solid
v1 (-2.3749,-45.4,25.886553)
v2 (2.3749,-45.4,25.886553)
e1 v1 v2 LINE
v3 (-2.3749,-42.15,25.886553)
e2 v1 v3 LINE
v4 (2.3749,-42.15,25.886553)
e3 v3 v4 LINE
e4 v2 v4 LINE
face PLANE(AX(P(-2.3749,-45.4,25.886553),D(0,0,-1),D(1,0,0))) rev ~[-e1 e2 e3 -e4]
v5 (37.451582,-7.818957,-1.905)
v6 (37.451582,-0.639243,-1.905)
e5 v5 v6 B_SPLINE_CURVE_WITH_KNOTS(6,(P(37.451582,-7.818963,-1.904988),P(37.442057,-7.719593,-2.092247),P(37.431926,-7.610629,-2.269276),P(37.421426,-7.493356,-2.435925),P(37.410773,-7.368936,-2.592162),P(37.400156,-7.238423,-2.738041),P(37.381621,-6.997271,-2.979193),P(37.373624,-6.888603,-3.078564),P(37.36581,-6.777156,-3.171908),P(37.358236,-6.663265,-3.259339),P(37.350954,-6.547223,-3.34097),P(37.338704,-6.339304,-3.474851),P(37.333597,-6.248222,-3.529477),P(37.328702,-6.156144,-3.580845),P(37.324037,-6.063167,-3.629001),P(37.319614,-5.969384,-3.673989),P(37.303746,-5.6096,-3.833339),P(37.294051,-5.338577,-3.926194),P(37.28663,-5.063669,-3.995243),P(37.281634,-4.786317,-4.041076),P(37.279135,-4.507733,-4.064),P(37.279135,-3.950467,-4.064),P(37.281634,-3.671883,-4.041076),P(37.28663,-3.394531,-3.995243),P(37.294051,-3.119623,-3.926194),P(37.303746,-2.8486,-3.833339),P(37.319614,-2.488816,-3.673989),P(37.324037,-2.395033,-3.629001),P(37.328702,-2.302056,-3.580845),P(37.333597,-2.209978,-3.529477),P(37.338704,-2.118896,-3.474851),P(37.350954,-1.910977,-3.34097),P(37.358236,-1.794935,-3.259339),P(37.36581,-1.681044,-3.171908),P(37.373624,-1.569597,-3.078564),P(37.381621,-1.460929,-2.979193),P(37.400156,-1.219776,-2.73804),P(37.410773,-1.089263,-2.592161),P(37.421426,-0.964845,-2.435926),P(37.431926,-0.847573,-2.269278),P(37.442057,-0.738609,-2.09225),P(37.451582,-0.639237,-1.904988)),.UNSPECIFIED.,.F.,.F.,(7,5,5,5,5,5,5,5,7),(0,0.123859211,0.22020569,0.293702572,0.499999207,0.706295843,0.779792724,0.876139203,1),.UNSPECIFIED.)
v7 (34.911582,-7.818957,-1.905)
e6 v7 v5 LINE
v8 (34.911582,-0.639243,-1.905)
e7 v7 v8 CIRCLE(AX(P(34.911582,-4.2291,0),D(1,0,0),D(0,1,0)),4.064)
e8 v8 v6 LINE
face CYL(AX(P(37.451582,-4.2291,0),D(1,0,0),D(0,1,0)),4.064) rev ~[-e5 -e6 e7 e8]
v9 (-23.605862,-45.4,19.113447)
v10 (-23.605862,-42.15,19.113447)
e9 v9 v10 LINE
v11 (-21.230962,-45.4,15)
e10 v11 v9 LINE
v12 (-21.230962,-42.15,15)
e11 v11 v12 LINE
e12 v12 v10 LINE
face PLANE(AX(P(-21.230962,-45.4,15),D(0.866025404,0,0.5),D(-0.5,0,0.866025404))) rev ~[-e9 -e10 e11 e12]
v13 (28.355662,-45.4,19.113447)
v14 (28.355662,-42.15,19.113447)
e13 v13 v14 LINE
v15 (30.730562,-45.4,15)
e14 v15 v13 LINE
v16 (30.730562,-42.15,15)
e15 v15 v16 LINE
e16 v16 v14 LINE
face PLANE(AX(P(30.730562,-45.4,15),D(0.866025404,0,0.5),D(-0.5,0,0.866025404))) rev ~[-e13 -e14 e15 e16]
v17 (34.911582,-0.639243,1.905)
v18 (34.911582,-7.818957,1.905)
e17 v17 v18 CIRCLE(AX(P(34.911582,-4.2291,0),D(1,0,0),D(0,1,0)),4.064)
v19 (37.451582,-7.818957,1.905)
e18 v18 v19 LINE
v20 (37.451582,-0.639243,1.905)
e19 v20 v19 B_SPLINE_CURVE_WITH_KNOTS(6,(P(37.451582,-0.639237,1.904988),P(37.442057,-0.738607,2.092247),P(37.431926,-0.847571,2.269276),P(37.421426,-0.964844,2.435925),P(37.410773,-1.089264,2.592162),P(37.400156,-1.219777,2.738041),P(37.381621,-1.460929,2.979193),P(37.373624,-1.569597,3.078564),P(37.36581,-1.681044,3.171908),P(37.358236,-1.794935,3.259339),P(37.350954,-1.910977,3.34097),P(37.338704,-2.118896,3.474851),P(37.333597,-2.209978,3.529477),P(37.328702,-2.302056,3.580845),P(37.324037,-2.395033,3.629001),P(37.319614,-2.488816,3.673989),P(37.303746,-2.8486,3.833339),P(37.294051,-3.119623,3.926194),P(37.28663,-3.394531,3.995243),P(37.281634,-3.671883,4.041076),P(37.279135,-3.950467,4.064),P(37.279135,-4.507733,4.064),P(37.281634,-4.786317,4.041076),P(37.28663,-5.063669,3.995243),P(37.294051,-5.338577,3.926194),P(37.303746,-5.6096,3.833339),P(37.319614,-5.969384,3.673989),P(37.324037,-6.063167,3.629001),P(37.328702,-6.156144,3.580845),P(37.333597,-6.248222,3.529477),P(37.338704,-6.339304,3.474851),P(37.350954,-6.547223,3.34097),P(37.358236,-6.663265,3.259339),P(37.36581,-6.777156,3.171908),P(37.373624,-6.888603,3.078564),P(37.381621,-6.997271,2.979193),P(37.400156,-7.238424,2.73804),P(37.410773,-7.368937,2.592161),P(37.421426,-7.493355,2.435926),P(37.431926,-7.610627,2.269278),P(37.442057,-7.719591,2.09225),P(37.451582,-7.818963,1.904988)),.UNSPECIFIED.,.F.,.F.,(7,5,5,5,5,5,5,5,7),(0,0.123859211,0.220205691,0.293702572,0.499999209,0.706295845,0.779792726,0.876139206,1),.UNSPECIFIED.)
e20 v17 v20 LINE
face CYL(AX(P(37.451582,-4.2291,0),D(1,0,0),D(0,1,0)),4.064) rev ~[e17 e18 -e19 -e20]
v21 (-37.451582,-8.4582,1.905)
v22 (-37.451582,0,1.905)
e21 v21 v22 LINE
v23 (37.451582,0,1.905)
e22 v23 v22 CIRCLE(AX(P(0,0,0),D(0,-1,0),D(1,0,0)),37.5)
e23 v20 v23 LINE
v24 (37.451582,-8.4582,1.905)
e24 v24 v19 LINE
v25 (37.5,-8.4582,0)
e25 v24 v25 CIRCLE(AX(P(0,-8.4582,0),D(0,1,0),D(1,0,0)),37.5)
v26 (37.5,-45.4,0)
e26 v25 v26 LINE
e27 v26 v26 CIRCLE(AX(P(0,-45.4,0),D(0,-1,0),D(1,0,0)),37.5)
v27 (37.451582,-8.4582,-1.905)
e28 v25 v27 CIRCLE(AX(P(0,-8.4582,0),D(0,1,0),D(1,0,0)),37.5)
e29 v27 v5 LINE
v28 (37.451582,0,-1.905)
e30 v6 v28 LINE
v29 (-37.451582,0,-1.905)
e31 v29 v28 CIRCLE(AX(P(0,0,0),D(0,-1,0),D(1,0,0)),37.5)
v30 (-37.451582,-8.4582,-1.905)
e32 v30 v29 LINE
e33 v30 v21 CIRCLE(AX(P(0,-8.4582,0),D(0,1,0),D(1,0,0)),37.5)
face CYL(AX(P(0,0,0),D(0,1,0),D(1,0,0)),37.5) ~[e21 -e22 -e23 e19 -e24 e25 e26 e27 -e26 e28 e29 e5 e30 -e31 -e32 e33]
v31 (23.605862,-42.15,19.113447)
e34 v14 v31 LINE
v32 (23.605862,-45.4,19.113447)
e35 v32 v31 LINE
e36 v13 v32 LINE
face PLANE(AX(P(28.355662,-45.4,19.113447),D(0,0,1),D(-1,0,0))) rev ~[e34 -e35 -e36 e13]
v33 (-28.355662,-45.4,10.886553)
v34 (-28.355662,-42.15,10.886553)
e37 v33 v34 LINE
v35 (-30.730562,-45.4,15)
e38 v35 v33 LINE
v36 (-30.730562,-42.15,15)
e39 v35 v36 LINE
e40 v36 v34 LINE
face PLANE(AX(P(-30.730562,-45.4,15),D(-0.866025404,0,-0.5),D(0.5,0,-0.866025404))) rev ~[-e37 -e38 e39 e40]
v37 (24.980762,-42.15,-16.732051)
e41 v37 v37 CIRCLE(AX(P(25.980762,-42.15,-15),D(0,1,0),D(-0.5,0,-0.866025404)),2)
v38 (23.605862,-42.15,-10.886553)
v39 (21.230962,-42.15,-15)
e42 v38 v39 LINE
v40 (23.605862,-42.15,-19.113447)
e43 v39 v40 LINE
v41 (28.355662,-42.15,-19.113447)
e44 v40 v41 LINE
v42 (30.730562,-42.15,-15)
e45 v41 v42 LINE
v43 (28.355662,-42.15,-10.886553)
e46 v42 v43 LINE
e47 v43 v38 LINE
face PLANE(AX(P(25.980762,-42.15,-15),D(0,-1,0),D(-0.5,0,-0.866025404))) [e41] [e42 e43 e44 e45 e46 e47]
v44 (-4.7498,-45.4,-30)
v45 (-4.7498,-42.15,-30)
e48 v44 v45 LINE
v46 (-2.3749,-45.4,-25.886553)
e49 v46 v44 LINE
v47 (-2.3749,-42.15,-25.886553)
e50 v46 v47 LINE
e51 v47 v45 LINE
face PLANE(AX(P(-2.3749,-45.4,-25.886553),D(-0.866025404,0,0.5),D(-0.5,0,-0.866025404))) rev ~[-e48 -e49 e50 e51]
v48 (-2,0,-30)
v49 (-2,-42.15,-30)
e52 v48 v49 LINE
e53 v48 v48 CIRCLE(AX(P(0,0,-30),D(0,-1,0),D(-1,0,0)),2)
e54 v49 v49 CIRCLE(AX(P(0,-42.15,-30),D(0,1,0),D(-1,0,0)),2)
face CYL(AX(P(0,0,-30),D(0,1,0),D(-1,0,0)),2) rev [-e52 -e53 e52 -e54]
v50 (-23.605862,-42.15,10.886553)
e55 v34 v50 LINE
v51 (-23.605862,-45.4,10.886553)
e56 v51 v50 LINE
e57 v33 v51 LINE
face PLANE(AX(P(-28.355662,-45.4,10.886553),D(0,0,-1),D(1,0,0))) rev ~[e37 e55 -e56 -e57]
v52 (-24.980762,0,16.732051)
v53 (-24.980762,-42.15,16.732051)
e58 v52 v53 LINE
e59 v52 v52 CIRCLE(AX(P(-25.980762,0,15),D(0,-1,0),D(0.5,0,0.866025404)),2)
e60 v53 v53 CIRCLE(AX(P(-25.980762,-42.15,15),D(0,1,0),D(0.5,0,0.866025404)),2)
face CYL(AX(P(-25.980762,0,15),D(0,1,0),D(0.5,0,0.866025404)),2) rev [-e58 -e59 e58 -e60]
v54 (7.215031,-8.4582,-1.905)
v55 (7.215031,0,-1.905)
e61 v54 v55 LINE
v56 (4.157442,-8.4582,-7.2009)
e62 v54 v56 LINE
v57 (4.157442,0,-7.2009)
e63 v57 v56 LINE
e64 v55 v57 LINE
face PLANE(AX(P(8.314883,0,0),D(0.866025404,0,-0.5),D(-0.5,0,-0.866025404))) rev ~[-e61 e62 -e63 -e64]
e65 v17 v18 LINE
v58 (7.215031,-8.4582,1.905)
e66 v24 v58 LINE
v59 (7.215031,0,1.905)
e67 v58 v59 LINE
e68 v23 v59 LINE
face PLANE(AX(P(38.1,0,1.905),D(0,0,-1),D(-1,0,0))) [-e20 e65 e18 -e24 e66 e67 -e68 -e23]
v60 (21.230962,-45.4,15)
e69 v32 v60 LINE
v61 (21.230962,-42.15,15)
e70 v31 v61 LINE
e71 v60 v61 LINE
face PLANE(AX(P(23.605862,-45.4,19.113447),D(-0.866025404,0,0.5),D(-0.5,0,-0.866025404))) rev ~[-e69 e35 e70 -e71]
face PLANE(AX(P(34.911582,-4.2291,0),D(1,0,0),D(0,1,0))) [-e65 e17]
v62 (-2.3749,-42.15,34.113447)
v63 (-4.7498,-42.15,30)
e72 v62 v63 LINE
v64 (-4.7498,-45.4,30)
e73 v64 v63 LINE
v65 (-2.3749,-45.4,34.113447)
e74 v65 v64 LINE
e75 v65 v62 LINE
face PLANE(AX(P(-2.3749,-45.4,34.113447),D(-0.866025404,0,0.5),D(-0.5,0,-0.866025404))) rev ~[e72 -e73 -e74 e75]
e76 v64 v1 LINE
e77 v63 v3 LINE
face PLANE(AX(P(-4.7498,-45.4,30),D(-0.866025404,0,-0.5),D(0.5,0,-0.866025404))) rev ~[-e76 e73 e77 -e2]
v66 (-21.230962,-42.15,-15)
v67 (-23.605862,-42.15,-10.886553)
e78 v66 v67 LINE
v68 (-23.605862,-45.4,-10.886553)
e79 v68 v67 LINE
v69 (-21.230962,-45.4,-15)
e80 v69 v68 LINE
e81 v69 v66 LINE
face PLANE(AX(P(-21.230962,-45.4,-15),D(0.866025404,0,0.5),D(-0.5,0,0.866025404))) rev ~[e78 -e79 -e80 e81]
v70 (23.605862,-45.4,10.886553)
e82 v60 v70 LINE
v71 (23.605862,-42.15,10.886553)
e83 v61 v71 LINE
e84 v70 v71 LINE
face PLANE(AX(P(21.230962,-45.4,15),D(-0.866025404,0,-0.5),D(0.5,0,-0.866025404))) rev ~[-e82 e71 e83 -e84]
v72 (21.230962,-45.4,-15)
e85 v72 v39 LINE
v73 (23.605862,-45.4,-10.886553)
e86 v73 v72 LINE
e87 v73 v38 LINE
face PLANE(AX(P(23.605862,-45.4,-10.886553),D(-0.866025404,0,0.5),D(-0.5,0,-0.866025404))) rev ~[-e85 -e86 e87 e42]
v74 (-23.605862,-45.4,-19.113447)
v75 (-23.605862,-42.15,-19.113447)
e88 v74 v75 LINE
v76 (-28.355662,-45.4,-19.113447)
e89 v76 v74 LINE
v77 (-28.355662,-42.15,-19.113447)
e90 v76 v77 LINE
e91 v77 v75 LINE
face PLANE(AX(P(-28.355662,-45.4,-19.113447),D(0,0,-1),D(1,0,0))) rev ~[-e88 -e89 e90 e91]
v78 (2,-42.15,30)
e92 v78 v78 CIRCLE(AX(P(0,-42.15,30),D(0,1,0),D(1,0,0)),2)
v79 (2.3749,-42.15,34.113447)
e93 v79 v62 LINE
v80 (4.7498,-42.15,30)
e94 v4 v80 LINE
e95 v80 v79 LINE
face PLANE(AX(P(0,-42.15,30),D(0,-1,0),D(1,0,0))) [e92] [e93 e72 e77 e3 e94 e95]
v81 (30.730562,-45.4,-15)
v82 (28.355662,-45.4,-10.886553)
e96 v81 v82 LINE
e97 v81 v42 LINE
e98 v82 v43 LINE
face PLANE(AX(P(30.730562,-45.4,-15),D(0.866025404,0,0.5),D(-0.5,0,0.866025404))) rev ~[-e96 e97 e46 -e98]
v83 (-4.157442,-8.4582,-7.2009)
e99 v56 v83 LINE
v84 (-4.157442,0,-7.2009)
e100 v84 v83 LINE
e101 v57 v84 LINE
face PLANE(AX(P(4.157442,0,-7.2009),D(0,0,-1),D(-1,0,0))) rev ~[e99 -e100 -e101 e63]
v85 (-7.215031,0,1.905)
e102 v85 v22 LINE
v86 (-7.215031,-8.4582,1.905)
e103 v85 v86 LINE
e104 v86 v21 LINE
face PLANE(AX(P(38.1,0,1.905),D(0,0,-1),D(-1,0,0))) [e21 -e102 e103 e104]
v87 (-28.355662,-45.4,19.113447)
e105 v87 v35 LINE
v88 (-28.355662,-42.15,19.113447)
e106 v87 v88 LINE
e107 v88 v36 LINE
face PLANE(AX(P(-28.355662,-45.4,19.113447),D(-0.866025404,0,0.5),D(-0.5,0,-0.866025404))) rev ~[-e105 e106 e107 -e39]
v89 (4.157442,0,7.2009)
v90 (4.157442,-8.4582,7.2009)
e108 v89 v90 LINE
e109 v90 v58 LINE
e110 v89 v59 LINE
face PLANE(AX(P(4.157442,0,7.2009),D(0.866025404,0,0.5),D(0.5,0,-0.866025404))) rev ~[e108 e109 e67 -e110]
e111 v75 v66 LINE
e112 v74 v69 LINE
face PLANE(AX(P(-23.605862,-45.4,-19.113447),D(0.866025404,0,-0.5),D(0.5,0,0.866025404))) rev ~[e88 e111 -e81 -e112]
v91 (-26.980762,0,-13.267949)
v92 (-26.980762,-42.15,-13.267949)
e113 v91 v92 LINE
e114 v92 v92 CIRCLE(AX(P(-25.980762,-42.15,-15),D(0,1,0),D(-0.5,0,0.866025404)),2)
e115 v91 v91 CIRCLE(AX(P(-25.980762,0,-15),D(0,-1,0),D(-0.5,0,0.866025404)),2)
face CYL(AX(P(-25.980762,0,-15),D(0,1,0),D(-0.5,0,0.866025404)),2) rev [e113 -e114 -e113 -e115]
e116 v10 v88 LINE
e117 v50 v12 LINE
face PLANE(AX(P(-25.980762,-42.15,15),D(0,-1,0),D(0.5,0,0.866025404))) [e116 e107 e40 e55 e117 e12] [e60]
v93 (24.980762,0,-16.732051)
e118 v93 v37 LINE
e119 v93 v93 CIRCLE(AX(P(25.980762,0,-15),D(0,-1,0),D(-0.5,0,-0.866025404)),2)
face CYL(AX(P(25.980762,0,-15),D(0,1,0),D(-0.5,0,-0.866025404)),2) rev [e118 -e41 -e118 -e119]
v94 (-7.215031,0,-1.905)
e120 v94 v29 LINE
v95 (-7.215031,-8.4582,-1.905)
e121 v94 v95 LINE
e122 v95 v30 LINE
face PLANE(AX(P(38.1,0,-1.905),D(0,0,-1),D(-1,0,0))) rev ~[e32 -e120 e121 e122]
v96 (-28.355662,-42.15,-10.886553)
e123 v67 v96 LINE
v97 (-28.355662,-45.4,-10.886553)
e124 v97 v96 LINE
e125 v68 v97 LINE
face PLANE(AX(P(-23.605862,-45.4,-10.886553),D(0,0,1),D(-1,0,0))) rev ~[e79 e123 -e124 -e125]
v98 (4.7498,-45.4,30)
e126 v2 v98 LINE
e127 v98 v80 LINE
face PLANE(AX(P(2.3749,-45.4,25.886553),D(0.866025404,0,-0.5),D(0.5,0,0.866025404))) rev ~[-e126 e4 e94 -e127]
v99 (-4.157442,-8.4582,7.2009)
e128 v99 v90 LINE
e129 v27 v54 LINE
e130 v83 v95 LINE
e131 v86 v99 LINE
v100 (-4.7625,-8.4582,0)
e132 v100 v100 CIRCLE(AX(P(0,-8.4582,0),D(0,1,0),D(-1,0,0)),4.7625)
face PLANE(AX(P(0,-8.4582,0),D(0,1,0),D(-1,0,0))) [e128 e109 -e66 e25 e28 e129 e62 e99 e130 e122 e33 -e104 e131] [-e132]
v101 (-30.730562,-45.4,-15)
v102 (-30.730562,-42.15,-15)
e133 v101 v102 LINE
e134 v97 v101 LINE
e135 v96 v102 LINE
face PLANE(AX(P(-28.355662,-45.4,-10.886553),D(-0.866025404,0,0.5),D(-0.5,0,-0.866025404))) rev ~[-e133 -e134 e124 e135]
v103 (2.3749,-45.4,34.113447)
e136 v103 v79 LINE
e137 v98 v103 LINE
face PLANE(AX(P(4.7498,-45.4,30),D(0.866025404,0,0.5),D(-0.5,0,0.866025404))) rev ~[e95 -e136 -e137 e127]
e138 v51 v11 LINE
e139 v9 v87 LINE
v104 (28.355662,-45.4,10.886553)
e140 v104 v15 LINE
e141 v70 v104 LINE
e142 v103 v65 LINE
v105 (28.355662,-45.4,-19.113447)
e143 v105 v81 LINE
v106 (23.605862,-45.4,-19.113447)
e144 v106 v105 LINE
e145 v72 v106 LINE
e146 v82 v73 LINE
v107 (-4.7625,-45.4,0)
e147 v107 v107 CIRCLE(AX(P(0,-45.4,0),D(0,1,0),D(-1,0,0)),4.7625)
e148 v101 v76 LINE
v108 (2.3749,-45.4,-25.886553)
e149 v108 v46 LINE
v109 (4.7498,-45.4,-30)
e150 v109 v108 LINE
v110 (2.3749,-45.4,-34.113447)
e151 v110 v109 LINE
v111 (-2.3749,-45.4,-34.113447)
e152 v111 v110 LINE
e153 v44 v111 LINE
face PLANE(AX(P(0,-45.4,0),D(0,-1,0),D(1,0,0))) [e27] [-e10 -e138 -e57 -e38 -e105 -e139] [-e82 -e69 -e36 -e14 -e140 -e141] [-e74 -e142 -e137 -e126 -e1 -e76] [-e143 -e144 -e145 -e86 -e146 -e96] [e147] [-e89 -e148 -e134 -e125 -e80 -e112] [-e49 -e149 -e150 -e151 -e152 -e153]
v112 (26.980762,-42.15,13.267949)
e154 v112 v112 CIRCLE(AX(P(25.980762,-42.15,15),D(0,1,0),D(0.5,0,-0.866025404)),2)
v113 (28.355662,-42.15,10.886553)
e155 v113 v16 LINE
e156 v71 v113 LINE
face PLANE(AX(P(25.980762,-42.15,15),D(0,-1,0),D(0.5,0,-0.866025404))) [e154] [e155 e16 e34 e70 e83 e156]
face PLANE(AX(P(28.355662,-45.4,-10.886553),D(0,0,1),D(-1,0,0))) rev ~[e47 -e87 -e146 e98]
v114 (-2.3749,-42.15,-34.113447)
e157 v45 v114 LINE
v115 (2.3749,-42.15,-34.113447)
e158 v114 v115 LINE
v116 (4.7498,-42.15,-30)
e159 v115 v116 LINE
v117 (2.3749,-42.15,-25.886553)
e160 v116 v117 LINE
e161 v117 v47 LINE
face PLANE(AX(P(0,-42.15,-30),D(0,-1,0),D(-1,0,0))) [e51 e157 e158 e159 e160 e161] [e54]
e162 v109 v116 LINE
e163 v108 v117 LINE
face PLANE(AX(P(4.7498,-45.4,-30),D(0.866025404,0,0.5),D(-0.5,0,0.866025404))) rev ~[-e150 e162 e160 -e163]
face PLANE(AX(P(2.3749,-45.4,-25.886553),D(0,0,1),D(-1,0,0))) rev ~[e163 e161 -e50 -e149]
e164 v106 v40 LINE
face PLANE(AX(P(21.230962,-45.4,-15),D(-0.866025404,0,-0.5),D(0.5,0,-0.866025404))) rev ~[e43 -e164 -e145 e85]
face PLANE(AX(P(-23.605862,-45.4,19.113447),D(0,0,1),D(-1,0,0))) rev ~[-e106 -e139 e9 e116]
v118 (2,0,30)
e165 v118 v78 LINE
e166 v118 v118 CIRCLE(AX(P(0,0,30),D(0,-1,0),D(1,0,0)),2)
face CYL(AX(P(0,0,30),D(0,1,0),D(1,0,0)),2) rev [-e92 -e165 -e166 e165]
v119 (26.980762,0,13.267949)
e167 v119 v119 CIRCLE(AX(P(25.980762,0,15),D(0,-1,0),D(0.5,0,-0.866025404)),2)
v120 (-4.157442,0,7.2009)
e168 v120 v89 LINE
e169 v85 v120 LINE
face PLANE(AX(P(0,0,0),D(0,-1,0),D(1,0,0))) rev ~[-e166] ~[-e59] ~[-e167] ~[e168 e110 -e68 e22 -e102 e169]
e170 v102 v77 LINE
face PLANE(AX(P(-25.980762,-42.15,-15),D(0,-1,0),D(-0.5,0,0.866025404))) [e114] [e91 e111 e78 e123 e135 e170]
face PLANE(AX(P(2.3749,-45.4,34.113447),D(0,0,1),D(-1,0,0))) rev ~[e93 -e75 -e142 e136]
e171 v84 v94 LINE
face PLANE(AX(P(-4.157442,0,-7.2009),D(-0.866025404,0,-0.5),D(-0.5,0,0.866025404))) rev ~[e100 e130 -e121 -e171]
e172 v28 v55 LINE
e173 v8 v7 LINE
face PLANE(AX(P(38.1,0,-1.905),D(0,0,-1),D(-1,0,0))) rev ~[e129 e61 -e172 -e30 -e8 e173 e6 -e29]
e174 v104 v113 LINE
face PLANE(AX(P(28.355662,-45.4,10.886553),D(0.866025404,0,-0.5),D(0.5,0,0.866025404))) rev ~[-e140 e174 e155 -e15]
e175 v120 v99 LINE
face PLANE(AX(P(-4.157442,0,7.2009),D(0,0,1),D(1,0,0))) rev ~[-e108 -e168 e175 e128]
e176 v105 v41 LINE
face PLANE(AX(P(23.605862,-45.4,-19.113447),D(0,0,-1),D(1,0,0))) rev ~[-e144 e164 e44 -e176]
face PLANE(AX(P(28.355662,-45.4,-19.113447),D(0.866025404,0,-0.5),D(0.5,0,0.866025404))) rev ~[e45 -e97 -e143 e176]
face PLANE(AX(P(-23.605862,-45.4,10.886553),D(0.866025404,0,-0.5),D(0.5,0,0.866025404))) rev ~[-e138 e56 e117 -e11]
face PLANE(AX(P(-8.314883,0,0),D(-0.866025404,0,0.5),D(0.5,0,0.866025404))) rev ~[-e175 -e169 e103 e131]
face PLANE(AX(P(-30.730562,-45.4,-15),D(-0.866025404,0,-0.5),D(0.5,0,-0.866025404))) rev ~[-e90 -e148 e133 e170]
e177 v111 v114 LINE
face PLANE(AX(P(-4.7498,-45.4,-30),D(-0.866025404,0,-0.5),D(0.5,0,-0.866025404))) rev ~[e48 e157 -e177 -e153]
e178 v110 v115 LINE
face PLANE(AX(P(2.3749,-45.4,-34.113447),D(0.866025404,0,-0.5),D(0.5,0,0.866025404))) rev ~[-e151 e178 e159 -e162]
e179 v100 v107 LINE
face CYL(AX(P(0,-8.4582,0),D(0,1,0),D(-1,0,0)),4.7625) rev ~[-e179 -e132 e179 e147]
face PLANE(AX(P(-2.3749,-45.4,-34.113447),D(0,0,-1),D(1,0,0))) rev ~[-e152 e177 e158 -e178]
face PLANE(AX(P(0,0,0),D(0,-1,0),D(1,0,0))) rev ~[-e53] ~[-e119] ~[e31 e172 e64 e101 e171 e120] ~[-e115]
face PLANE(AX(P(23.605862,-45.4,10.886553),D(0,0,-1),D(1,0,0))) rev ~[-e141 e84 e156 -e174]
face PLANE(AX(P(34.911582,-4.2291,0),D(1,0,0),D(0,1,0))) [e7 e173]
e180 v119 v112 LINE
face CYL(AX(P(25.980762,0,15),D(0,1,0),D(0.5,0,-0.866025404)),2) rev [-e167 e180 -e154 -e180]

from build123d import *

# Parameters (mm, degrees)
F0_R            = 37.5
F1_DEPTH        = 45.4
F2_R            = 2
F3_DEPTH        = 45.401
F3_COPIES_COUNT = 6
F5_DEPTH        = 3.25
F5_COPIES_COUNT = 6
F7_DEPTH        = 8.4582
F8_W            = 76.2
F8_H            = 3.81
F9_DEPTH        = 8.4582
F11_R           = 4.064
F12_DEPTH       = 2.54
F13_R           = 4.7625
F14_DEPTH       = 36.9428001


# Not quite as in the source:
# - a pattern or mirror of a feature is missing from the dataset's text; its kind, count and spacing are read off the source's solid


with BuildPart() as f1:
    # F0 (on Front) → F1 (new body)
    with BuildSketch(Plane.XZ):
        Circle(F0_R)
    extrude(amount=F1_DEPTH)

    # F2 (on Front) → F3 (cut, through all)
    with BuildSketch(Plane.XZ):
        with Locations((0, 30)):
            Circle(F2_R)
    f3 = extrude(amount=F3_DEPTH, mode=Mode.SUBTRACT)

    # F3_copies: F3 ×6 about axis
    f3_copies_axis = Axis((0, 0, 0), (0, 1, 0))
    for i in range(1, F3_COPIES_COUNT):
        add(f3.rotate(f3_copies_axis, i * 360 / F3_COPIES_COUNT), mode=Mode.SUBTRACT)

    # F4 (on face) → F5 (cut)
    with BuildSketch(Plane.XZ.offset(45.4)):
        Polygon((2.3749, 34.1134474629), (-2.3749, 34.1134474629), (-4.7498, 30), (-2.3749, 25.8865525371), (2.3749, 25.8865525371), (4.7498, 30), align=None)
    f5 = extrude(amount=-F5_DEPTH, mode=Mode.SUBTRACT)

    # F5_copies: F5 ×6 about axis
    f5_copies_axis = Axis((0, 0, 0), (0, 1, 0))
    for i in range(1, F5_COPIES_COUNT):
        add(f5.rotate(f5_copies_axis, i * 360 / F5_COPIES_COUNT), mode=Mode.SUBTRACT)

    # F6 (on face) → F7 (cut)
    with BuildSketch(Plane(origin=(0, 0, 0), x_dir=(-1, 0, 0), z_dir=(0, 1, 0))):
        Polygon((-4.1574415534, -7.2009), (4.1574415534, -7.2009), (8.3148831068, 0), (4.1574415534, 7.2009), (-4.1574415534, 7.2009), (-8.3148831068, 0), align=None)
    extrude(amount=-F7_DEPTH, mode=Mode.SUBTRACT)

    # F8 (on face) → F9 (cut, through all)
    with BuildSketch(Plane(origin=(0, 0, 0), x_dir=(-1, 0, 0), z_dir=(0, 1, 0))):
        Rectangle(F8_W, F8_H)
    extrude(amount=-F9_DEPTH, mode=Mode.SUBTRACT)

    # F11 (on 3pt) → F12 (cut)
    with BuildSketch(Plane.YZ.offset(37.4515817423)):
        with Locations((-4.2291, 0)):
            Circle(F11_R)
    extrude(amount=-F12_DEPTH, mode=Mode.SUBTRACT)

    # F13 (on face) → F14 (cut, through all)
    with BuildSketch(Plane(origin=(0, -8.4582, 0), x_dir=(-1, 0, 0), z_dir=(0, 1, 0))):
        Circle(F13_R)
    extrude(amount=-F14_DEPTH, mode=Mode.SUBTRACT)


solid = f1.part
